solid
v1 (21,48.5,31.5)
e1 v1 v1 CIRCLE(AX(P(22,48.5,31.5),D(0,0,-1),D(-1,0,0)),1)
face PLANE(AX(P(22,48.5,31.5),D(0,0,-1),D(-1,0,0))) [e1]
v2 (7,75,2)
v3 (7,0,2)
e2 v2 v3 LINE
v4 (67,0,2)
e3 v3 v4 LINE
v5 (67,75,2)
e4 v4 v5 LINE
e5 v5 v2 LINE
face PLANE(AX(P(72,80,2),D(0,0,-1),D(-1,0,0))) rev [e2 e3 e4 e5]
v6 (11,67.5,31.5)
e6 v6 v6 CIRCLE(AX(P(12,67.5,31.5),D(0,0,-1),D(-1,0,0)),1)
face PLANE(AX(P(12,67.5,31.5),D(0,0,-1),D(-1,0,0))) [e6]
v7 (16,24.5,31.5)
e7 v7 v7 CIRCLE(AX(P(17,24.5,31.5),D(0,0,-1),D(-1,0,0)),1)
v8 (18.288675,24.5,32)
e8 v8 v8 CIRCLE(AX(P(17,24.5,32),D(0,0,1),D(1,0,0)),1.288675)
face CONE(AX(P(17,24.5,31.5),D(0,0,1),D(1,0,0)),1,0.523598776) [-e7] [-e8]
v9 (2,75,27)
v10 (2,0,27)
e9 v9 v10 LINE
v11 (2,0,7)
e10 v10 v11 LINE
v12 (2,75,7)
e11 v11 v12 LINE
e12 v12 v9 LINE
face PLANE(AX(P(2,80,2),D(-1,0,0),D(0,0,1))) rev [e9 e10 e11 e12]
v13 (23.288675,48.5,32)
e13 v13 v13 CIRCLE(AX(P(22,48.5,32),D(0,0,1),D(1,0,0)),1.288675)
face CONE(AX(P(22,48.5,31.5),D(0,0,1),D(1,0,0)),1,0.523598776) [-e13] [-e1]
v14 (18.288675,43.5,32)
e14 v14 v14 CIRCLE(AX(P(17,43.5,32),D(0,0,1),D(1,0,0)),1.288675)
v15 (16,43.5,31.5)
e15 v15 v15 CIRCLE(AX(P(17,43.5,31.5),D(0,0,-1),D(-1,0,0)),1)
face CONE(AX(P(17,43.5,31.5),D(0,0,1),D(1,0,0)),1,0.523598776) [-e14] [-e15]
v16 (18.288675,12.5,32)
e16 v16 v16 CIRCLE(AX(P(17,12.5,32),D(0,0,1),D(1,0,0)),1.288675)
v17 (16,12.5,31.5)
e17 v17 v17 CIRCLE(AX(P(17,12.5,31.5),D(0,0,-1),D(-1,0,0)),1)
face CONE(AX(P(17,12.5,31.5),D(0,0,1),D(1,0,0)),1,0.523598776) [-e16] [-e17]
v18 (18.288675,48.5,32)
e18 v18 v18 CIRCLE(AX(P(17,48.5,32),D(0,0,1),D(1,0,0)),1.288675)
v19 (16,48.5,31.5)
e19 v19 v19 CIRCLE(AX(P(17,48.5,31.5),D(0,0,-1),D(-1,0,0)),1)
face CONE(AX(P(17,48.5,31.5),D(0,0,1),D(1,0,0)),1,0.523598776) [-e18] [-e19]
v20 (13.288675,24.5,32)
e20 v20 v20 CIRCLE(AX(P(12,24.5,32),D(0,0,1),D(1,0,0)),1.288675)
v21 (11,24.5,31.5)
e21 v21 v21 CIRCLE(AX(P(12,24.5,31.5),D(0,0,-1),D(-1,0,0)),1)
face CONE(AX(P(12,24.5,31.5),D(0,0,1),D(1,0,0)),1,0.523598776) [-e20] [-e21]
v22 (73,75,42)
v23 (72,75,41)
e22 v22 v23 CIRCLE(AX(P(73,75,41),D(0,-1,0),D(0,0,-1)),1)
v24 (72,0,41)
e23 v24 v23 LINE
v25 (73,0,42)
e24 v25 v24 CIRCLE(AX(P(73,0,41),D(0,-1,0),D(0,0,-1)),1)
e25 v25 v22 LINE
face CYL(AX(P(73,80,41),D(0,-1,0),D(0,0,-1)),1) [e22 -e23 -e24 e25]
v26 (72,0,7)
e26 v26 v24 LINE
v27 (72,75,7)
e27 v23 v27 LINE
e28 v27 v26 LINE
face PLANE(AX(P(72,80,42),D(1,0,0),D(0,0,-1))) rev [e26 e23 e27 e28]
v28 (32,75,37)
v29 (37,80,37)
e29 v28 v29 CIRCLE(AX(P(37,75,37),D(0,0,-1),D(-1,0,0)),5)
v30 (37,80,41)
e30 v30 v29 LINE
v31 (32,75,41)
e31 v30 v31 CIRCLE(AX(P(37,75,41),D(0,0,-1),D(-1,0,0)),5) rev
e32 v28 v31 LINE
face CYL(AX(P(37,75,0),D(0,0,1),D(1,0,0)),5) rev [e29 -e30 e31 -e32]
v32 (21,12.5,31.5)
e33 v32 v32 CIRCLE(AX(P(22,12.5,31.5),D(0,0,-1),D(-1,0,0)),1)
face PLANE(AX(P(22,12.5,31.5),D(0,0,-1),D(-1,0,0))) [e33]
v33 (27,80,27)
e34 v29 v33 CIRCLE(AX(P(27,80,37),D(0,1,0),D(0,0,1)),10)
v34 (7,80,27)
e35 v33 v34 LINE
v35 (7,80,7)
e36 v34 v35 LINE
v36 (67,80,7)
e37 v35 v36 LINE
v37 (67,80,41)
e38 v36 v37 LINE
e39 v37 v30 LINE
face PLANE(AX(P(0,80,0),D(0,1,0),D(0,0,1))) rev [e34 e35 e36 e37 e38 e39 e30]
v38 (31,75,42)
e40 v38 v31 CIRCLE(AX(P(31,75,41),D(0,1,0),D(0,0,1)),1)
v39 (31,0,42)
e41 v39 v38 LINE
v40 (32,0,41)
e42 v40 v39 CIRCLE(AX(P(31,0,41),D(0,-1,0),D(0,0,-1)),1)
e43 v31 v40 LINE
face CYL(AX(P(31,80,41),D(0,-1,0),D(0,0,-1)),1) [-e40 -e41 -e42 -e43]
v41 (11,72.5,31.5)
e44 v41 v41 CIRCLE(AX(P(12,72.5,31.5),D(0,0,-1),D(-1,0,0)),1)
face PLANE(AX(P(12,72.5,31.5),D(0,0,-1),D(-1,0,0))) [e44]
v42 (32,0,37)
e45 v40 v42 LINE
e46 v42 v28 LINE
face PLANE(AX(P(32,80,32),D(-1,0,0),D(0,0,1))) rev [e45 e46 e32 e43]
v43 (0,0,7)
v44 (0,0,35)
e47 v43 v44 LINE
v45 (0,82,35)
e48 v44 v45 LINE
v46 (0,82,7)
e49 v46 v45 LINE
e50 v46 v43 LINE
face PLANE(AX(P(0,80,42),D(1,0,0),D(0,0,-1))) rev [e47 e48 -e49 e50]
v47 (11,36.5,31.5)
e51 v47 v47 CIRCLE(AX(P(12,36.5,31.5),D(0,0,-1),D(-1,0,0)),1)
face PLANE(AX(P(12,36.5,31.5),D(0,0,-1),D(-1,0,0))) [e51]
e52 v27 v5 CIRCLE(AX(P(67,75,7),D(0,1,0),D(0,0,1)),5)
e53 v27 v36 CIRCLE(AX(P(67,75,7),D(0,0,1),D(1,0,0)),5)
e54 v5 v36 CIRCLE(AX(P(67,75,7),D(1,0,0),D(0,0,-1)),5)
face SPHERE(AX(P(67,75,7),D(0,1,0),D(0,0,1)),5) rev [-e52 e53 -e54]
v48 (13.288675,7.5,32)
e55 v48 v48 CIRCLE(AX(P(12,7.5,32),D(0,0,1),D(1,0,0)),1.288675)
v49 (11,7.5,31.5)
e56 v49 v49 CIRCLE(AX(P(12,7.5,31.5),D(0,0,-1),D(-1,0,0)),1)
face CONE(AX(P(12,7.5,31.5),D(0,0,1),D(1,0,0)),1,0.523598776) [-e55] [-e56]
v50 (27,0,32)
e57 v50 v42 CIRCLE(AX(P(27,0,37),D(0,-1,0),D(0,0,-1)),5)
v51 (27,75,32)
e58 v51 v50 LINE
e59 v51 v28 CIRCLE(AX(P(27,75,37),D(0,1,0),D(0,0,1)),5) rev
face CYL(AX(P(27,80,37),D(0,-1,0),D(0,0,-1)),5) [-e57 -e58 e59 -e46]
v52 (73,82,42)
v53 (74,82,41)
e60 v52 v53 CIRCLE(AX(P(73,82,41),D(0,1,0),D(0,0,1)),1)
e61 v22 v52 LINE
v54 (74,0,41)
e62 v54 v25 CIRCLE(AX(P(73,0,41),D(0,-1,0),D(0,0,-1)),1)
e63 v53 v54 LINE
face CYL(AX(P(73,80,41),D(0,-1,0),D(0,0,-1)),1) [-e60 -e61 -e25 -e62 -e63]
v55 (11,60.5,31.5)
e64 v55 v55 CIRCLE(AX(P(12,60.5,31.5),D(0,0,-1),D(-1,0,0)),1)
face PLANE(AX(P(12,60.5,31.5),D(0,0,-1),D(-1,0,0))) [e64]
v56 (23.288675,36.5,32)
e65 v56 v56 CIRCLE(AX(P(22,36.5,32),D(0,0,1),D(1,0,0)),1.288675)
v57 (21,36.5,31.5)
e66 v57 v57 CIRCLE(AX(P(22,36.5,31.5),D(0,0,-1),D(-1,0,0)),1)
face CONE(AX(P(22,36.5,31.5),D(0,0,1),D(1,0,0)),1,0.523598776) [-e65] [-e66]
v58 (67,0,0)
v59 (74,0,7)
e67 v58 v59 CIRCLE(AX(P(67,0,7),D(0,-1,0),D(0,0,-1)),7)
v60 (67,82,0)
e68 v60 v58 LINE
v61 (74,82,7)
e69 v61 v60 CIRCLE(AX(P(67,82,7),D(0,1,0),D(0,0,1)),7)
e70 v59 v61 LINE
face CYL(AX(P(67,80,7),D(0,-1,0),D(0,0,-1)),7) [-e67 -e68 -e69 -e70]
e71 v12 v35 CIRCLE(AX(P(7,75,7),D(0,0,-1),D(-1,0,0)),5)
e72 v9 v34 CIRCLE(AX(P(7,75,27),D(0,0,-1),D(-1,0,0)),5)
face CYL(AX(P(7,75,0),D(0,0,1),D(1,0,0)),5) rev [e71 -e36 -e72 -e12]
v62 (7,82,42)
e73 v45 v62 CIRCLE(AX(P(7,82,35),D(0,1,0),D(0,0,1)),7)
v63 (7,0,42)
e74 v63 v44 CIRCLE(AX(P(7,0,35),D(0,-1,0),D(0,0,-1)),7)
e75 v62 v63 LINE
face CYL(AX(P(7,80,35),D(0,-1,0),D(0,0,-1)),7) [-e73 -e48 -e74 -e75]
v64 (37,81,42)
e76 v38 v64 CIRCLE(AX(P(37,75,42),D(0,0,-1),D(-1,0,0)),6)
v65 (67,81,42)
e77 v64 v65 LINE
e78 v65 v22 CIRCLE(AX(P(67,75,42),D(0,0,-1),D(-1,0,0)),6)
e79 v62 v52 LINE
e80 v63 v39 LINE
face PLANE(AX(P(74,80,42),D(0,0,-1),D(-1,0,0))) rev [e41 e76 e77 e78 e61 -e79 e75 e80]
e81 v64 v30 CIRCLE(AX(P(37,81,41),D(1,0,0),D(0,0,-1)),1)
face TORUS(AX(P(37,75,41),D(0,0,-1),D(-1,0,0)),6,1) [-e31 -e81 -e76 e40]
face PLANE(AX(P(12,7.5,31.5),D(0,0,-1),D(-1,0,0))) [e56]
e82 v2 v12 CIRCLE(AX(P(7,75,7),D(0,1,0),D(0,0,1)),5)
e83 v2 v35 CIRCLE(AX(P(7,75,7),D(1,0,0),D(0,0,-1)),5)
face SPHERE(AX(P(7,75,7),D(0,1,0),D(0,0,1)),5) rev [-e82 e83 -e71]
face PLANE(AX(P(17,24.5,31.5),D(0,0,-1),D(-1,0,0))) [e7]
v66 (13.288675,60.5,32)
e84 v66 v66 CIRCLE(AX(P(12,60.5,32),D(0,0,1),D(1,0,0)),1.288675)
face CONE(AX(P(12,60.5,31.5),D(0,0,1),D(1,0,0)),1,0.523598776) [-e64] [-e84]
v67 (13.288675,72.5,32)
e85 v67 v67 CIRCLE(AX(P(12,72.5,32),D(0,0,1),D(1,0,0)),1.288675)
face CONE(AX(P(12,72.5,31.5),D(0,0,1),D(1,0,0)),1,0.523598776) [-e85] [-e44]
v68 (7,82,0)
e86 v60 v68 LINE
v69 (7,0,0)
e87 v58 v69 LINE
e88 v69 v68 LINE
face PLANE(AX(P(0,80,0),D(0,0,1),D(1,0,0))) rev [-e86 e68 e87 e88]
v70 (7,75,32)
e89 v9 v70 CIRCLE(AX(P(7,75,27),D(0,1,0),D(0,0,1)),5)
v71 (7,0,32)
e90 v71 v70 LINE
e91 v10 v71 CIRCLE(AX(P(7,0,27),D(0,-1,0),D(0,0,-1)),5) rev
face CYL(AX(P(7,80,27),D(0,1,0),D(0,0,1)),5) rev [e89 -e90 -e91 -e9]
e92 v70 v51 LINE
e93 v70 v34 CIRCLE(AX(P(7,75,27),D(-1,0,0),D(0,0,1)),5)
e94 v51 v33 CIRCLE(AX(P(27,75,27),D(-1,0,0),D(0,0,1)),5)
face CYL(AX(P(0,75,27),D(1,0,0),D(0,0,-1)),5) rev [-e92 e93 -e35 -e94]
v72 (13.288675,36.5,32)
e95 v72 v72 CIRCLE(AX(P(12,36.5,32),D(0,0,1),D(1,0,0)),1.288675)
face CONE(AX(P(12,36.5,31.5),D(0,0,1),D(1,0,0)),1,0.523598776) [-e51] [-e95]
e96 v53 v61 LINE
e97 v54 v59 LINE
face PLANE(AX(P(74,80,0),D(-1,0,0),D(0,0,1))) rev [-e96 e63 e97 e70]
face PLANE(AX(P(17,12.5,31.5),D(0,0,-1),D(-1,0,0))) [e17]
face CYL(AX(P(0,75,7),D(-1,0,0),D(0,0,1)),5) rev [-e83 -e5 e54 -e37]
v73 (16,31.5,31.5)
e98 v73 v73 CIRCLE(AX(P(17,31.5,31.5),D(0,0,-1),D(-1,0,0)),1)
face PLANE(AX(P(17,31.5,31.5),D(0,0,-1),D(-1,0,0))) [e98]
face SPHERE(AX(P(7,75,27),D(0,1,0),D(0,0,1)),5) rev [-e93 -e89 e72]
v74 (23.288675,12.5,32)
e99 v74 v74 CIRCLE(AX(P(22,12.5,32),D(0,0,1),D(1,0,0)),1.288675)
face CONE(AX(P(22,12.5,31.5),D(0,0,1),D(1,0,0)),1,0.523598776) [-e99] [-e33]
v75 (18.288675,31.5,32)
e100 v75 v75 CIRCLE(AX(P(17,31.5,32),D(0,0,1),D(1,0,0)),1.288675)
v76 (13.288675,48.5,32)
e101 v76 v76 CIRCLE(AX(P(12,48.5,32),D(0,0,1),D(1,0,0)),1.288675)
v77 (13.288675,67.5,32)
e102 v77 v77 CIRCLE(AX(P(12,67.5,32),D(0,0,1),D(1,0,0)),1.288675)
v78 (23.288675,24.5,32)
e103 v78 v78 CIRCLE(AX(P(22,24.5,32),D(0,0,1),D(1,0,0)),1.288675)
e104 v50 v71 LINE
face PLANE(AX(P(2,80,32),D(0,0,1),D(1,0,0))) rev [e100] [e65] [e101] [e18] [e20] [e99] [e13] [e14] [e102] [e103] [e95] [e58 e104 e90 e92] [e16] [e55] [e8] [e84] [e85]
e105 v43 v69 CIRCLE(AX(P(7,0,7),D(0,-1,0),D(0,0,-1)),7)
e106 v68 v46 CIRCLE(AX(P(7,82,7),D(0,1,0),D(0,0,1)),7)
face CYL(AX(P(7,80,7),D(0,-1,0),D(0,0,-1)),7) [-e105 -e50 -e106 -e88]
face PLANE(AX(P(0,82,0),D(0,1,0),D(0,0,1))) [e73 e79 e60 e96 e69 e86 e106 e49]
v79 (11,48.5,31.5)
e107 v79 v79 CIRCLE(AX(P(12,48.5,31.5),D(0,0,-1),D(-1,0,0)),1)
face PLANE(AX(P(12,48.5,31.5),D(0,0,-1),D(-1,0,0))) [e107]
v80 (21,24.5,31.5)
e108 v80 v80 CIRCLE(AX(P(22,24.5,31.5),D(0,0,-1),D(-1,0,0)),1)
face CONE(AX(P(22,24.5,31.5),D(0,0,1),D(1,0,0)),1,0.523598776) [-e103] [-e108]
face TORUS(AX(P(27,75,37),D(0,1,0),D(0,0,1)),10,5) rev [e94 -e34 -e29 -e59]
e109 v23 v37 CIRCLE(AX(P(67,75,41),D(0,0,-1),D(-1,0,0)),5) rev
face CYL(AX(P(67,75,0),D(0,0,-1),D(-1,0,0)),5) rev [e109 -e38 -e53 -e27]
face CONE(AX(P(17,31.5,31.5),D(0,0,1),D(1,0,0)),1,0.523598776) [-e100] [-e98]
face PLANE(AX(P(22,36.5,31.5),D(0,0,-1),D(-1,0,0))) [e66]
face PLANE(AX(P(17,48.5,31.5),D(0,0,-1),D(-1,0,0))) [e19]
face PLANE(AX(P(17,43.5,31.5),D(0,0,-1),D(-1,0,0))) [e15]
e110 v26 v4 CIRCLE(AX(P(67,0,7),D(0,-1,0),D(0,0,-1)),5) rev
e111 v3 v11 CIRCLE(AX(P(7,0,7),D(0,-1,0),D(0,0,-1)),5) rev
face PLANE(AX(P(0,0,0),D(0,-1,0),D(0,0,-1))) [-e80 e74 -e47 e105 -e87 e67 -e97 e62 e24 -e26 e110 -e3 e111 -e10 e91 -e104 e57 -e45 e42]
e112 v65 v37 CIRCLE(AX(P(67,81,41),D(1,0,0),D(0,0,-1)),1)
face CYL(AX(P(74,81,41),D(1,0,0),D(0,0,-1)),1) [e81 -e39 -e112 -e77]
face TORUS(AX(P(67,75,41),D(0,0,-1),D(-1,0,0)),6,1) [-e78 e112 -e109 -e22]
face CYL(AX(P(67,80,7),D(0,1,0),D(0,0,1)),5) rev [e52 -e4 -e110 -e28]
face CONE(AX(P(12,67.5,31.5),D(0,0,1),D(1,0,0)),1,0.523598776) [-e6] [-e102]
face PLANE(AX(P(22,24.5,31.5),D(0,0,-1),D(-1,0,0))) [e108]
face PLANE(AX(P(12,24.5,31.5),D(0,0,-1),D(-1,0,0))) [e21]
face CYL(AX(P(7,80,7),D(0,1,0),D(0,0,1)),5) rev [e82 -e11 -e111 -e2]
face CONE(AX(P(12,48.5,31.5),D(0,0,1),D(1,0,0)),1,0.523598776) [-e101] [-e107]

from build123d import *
from OCP.BRepFilletAPI import BRepFilletAPI_MakeChamfer

# Parameters (mm, degrees)
BOSS_EXTRUDE1_DEPTH = 80
SKETCH2_W           = 74
SKETCH2_H           = 42
BOSS_EXTRUDE2_DEPTH = 2
FILLET1_R           = 5
FILLET2_R           = 7
FILLET3_R           = 5
FILLET5_R           = 1
SKETCH3_R           = 1
BOSS_EXTRUDE4_DEPTH = 0.5
CHAMFER1_SIZE       = 0.288675135
CHAMFER1_SIZE_2     = 0.5


with BuildPart() as part:
    # Sketch1 → Boss-Extrude1 (new body)
    with BuildSketch(Plane(origin=(0, 0, 0), x_dir=(1, 0, 0), z_dir=(0, 1, 0))):
        Polygon((0, 0), (74, 0), (74, -42), (72, -42), (72, -2), (2, -2), (2, -32), (32, -32), (32, -42), (0, -42), align=None)
    extrude(amount=BOSS_EXTRUDE1_DEPTH)

    # Sketch2 → Boss-Extrude2 (add)
    with BuildSketch(Plane(origin=(0, 80, 0), x_dir=(1, 0, 0), z_dir=(0, 1, 0))):
        with Locations((37, -21)):
            Rectangle(SKETCH2_W, SKETCH2_H)
    extrude(amount=BOSS_EXTRUDE2_DEPTH)

    # Fillet1
    fillet1_edges = [part.edges().sort_by_distance(p)[0] for p in [
        (72, 40, 2),
        (2, 40, 2),
        (2, 40, 32),
        (32, 40, 32),
    ]]
    fillet(fillet1_edges, radius=FILLET1_R)

    # Fillet2
    fillet2_edges = [part.edges().sort_by_distance(p)[0] for p in [
        (0, 41, 0),
        (74, 41, 0),
        (0, 41, 42),
    ]]
    fillet(fillet2_edges, radius=FILLET2_R)

    # Fillet3
    fillet3_edges = [part.edges().sort_by_distance(p)[0] for p in [
        (32, 80, 39.5),
        (17, 80, 32),
        (2, 80, 17),
        (37, 80, 2),
        (72, 80, 24.5),
        (3.464466094, 80, 3.464466094),
        (70.535533906, 80, 3.464466094),
        (3.464466094, 80, 30.535533906),
        (30.535533906, 80, 33.464466094),
    ]]
    fillet(fillet3_edges, radius=FILLET3_R)

    # Fillet5
    fillet5_edges = [part.edges().sort_by_distance(p)[0] for p in [
        (70.535533906, 78.535533906, 42),
        (74, 41, 42),
        (52, 80, 42),
        (32, 37.5, 42),
        (72, 37.5, 42),
        (33.464466094, 78.535533906, 42),
    ]]
    fillet(fillet5_edges, radius=FILLET5_R - 0.0001)  # a hair under: the kernel refuses the full size

    # Sketch3 → Boss-Extrude4 (add)
    with BuildSketch(Plane(origin=(0, 0, 32), x_dir=(-1, 0, 0), z_dir=(0, 0, -1))):
        with Locations(Location((-12, 72.5, 0), (0, 0, 180))):
            Circle(SKETCH3_R)
        with Locations(Location((-12, 67.5, 0), (0, 0, 180))):
            Circle(SKETCH3_R)
        with Locations(Location((-12, 60.5, 0), (0, 0, 180))):
            Circle(SKETCH3_R)
        with Locations(Location((-12, 48.5, 0), (0, 0, 180))):
            Circle(SKETCH3_R)
        with Locations(Location((-17, 43.5, 0), (0, 0, 180))):
            Circle(SKETCH3_R)
        with Locations(Location((-17, 48.5, 0), (0, 0, 180))):
            Circle(SKETCH3_R)
        with Locations(Location((-22, 48.5, 0), (0, 0, 180))):
            Circle(SKETCH3_R)
        with Locations(Location((-12, 36.5, 0), (0, 0, 180))):
            Circle(SKETCH3_R)
        with Locations(Location((-17, 31.5, 0), (0, 0, 180))):
            Circle(SKETCH3_R)
        with Locations(Location((-22, 36.5, 0), (0, 0, 180))):
            Circle(SKETCH3_R)
        with Locations(Location((-12, 24.5, 0), (0, 0, 180))):
            Circle(SKETCH3_R)
        with Locations(Location((-17, 24.5, 0), (0, 0, 180))):
            Circle(SKETCH3_R)
        with Locations(Location((-22, 24.5, 0), (0, 0, 180))):
            Circle(SKETCH3_R)
        with Locations(Location((-22, 12.5, 0), (0, 0, 180))):
            Circle(SKETCH3_R)
        with Locations(Location((-17, 12.5, 0), (0, 0, 180))):
            Circle(SKETCH3_R)
        with Locations(Location((-12, 7.5, 0), (0, 0, 180))):
            Circle(SKETCH3_R)
    extrude(amount=BOSS_EXTRUDE4_DEPTH)

    # Chamfer1
    chamfer1_edges_1 = [part.edges().sort_by_distance(p)[0] for p in [
        (11, 67.5, 32),
    ]]
    chamfer1_side_1 = [part.faces().sort_by_distance(p)[0] for p in [
        (10.994226497, 67.5, 32),
    ]]
    chamfer1_edges_2 = [part.edges().sort_by_distance(p)[0] for p in [
        (11, 60.5, 32),
    ]]
    chamfer1_side_2 = [part.faces().sort_by_distance(p)[0] for p in [
        (10.994226497, 60.5, 32),
    ]]
    chamfer1_edges_3 = [part.edges().sort_by_distance(p)[0] for p in [
        (11, 48.5, 32),
    ]]
    chamfer1_side_3 = [part.faces().sort_by_distance(p)[0] for p in [
        (10.994226497, 48.5, 32),
    ]]
    chamfer1_edges_4 = [part.edges().sort_by_distance(p)[0] for p in [
        (11, 72.5, 32),
    ]]
    chamfer1_side_4 = [part.faces().sort_by_distance(p)[0] for p in [
        (10.994226497, 72.5, 32),
    ]]
    chamfer1_edges_5 = [part.edges().sort_by_distance(p)[0] for p in [
        (16, 43.5, 32),
    ]]
    chamfer1_side_5 = [part.faces().sort_by_distance(p)[0] for p in [
        (15.994226497, 43.5, 32),
    ]]
    chamfer1_edges_6 = [part.edges().sort_by_distance(p)[0] for p in [
        (16, 48.5, 32),
    ]]
    chamfer1_side_6 = [part.faces().sort_by_distance(p)[0] for p in [
        (15.994226497, 48.5, 32),
    ]]
    chamfer1_edges_7 = [part.edges().sort_by_distance(p)[0] for p in [
        (21, 48.5, 32),
    ]]
    chamfer1_side_7 = [part.faces().sort_by_distance(p)[0] for p in [
        (20.994226497, 48.5, 32),
    ]]
    chamfer1_edges_8 = [part.edges().sort_by_distance(p)[0] for p in [
        (11, 36.5, 32),
    ]]
    chamfer1_side_8 = [part.faces().sort_by_distance(p)[0] for p in [
        (10.994226497, 36.5, 32),
    ]]
    chamfer1_edges_9 = [part.edges().sort_by_distance(p)[0] for p in [
        (16, 31.5, 32),
    ]]
    chamfer1_side_9 = [part.faces().sort_by_distance(p)[0] for p in [
        (15.994226497, 31.5, 32),
    ]]
    chamfer1_edges_10 = [part.edges().sort_by_distance(p)[0] for p in [
        (21, 36.5, 32),
    ]]
    chamfer1_side_10 = [part.faces().sort_by_distance(p)[0] for p in [
        (20.994226497, 36.5, 32),
    ]]
    chamfer1_edges_11 = [part.edges().sort_by_distance(p)[0] for p in [
        (11, 24.5, 32),
    ]]
    chamfer1_side_11 = [part.faces().sort_by_distance(p)[0] for p in [
        (10.994226497, 24.5, 32),
    ]]
    chamfer1_edges_12 = [part.edges().sort_by_distance(p)[0] for p in [
        (16, 24.5, 32),
    ]]
    chamfer1_side_12 = [part.faces().sort_by_distance(p)[0] for p in [
        (15.994226497, 24.5, 32),
    ]]
    chamfer1_edges_13 = [part.edges().sort_by_distance(p)[0] for p in [
        (21, 24.5, 32),
    ]]
    chamfer1_side_13 = [part.faces().sort_by_distance(p)[0] for p in [
        (20.994226497, 24.5, 32),
    ]]
    chamfer1_edges_14 = [part.edges().sort_by_distance(p)[0] for p in [
        (21, 12.5, 32),
    ]]
    chamfer1_side_14 = [part.faces().sort_by_distance(p)[0] for p in [
        (20.994226497, 12.5, 32),
    ]]
    chamfer1_edges_15 = [part.edges().sort_by_distance(p)[0] for p in [
        (16, 12.5, 32),
    ]]
    chamfer1_side_15 = [part.faces().sort_by_distance(p)[0] for p in [
        (15.994226497, 12.5, 32),
    ]]
    chamfer1_edges_16 = [part.edges().sort_by_distance(p)[0] for p in [
        (11, 7.5, 32),
    ]]
    chamfer1_side_16 = [part.faces().sort_by_distance(p)[0] for p in [
        (10.994226497, 7.5, 32),
    ]]
    chamfer1 = BRepFilletAPI_MakeChamfer(part.part.solid().wrapped)
    for e in chamfer1_edges_1:
        chamfer1.Add(CHAMFER1_SIZE - 0.0001, CHAMFER1_SIZE_2 - 0.0001, e.wrapped, chamfer1_side_1[0].wrapped)
    for e in chamfer1_edges_2:
        chamfer1.Add(CHAMFER1_SIZE - 0.0001, CHAMFER1_SIZE_2 - 0.0001, e.wrapped, chamfer1_side_2[0].wrapped)
    for e in chamfer1_edges_3:
        chamfer1.Add(CHAMFER1_SIZE - 0.0001, CHAMFER1_SIZE_2 - 0.0001, e.wrapped, chamfer1_side_3[0].wrapped)
    for e in chamfer1_edges_4:
        chamfer1.Add(CHAMFER1_SIZE - 0.0001, CHAMFER1_SIZE_2 - 0.0001, e.wrapped, chamfer1_side_4[0].wrapped)
    for e in chamfer1_edges_5:
        chamfer1.Add(CHAMFER1_SIZE - 0.0001, CHAMFER1_SIZE_2 - 0.0001, e.wrapped, chamfer1_side_5[0].wrapped)
    for e in chamfer1_edges_6:
        chamfer1.Add(CHAMFER1_SIZE - 0.0001, CHAMFER1_SIZE_2 - 0.0001, e.wrapped, chamfer1_side_6[0].wrapped)
    for e in chamfer1_edges_7:
        chamfer1.Add(CHAMFER1_SIZE - 0.0001, CHAMFER1_SIZE_2 - 0.0001, e.wrapped, chamfer1_side_7[0].wrapped)
    for e in chamfer1_edges_8:
        chamfer1.Add(CHAMFER1_SIZE - 0.0001, CHAMFER1_SIZE_2 - 0.0001, e.wrapped, chamfer1_side_8[0].wrapped)
    for e in chamfer1_edges_9:
        chamfer1.Add(CHAMFER1_SIZE - 0.0001, CHAMFER1_SIZE_2 - 0.0001, e.wrapped, chamfer1_side_9[0].wrapped)
    for e in chamfer1_edges_10:
        chamfer1.Add(CHAMFER1_SIZE - 0.0001, CHAMFER1_SIZE_2 - 0.0001, e.wrapped, chamfer1_side_10[0].wrapped)
    for e in chamfer1_edges_11:
        chamfer1.Add(CHAMFER1_SIZE - 0.0001, CHAMFER1_SIZE_2 - 0.0001, e.wrapped, chamfer1_side_11[0].wrapped)
    for e in chamfer1_edges_12:
        chamfer1.Add(CHAMFER1_SIZE - 0.0001, CHAMFER1_SIZE_2 - 0.0001, e.wrapped, chamfer1_side_12[0].wrapped)
    for e in chamfer1_edges_13:
        chamfer1.Add(CHAMFER1_SIZE - 0.0001, CHAMFER1_SIZE_2 - 0.0001, e.wrapped, chamfer1_side_13[0].wrapped)
    for e in chamfer1_edges_14:
        chamfer1.Add(CHAMFER1_SIZE - 0.0001, CHAMFER1_SIZE_2 - 0.0001, e.wrapped, chamfer1_side_14[0].wrapped)
    for e in chamfer1_edges_15:
        chamfer1.Add(CHAMFER1_SIZE - 0.0001, CHAMFER1_SIZE_2 - 0.0001, e.wrapped, chamfer1_side_15[0].wrapped)
    for e in chamfer1_edges_16:
        chamfer1.Add(CHAMFER1_SIZE - 0.0001, CHAMFER1_SIZE_2 - 0.0001, e.wrapped, chamfer1_side_16[0].wrapped)
    add(Compound.cast(chamfer1.Shape()), mode=Mode.REPLACE)  # a hair under: the kernel refuses the full size


solid = part.part
